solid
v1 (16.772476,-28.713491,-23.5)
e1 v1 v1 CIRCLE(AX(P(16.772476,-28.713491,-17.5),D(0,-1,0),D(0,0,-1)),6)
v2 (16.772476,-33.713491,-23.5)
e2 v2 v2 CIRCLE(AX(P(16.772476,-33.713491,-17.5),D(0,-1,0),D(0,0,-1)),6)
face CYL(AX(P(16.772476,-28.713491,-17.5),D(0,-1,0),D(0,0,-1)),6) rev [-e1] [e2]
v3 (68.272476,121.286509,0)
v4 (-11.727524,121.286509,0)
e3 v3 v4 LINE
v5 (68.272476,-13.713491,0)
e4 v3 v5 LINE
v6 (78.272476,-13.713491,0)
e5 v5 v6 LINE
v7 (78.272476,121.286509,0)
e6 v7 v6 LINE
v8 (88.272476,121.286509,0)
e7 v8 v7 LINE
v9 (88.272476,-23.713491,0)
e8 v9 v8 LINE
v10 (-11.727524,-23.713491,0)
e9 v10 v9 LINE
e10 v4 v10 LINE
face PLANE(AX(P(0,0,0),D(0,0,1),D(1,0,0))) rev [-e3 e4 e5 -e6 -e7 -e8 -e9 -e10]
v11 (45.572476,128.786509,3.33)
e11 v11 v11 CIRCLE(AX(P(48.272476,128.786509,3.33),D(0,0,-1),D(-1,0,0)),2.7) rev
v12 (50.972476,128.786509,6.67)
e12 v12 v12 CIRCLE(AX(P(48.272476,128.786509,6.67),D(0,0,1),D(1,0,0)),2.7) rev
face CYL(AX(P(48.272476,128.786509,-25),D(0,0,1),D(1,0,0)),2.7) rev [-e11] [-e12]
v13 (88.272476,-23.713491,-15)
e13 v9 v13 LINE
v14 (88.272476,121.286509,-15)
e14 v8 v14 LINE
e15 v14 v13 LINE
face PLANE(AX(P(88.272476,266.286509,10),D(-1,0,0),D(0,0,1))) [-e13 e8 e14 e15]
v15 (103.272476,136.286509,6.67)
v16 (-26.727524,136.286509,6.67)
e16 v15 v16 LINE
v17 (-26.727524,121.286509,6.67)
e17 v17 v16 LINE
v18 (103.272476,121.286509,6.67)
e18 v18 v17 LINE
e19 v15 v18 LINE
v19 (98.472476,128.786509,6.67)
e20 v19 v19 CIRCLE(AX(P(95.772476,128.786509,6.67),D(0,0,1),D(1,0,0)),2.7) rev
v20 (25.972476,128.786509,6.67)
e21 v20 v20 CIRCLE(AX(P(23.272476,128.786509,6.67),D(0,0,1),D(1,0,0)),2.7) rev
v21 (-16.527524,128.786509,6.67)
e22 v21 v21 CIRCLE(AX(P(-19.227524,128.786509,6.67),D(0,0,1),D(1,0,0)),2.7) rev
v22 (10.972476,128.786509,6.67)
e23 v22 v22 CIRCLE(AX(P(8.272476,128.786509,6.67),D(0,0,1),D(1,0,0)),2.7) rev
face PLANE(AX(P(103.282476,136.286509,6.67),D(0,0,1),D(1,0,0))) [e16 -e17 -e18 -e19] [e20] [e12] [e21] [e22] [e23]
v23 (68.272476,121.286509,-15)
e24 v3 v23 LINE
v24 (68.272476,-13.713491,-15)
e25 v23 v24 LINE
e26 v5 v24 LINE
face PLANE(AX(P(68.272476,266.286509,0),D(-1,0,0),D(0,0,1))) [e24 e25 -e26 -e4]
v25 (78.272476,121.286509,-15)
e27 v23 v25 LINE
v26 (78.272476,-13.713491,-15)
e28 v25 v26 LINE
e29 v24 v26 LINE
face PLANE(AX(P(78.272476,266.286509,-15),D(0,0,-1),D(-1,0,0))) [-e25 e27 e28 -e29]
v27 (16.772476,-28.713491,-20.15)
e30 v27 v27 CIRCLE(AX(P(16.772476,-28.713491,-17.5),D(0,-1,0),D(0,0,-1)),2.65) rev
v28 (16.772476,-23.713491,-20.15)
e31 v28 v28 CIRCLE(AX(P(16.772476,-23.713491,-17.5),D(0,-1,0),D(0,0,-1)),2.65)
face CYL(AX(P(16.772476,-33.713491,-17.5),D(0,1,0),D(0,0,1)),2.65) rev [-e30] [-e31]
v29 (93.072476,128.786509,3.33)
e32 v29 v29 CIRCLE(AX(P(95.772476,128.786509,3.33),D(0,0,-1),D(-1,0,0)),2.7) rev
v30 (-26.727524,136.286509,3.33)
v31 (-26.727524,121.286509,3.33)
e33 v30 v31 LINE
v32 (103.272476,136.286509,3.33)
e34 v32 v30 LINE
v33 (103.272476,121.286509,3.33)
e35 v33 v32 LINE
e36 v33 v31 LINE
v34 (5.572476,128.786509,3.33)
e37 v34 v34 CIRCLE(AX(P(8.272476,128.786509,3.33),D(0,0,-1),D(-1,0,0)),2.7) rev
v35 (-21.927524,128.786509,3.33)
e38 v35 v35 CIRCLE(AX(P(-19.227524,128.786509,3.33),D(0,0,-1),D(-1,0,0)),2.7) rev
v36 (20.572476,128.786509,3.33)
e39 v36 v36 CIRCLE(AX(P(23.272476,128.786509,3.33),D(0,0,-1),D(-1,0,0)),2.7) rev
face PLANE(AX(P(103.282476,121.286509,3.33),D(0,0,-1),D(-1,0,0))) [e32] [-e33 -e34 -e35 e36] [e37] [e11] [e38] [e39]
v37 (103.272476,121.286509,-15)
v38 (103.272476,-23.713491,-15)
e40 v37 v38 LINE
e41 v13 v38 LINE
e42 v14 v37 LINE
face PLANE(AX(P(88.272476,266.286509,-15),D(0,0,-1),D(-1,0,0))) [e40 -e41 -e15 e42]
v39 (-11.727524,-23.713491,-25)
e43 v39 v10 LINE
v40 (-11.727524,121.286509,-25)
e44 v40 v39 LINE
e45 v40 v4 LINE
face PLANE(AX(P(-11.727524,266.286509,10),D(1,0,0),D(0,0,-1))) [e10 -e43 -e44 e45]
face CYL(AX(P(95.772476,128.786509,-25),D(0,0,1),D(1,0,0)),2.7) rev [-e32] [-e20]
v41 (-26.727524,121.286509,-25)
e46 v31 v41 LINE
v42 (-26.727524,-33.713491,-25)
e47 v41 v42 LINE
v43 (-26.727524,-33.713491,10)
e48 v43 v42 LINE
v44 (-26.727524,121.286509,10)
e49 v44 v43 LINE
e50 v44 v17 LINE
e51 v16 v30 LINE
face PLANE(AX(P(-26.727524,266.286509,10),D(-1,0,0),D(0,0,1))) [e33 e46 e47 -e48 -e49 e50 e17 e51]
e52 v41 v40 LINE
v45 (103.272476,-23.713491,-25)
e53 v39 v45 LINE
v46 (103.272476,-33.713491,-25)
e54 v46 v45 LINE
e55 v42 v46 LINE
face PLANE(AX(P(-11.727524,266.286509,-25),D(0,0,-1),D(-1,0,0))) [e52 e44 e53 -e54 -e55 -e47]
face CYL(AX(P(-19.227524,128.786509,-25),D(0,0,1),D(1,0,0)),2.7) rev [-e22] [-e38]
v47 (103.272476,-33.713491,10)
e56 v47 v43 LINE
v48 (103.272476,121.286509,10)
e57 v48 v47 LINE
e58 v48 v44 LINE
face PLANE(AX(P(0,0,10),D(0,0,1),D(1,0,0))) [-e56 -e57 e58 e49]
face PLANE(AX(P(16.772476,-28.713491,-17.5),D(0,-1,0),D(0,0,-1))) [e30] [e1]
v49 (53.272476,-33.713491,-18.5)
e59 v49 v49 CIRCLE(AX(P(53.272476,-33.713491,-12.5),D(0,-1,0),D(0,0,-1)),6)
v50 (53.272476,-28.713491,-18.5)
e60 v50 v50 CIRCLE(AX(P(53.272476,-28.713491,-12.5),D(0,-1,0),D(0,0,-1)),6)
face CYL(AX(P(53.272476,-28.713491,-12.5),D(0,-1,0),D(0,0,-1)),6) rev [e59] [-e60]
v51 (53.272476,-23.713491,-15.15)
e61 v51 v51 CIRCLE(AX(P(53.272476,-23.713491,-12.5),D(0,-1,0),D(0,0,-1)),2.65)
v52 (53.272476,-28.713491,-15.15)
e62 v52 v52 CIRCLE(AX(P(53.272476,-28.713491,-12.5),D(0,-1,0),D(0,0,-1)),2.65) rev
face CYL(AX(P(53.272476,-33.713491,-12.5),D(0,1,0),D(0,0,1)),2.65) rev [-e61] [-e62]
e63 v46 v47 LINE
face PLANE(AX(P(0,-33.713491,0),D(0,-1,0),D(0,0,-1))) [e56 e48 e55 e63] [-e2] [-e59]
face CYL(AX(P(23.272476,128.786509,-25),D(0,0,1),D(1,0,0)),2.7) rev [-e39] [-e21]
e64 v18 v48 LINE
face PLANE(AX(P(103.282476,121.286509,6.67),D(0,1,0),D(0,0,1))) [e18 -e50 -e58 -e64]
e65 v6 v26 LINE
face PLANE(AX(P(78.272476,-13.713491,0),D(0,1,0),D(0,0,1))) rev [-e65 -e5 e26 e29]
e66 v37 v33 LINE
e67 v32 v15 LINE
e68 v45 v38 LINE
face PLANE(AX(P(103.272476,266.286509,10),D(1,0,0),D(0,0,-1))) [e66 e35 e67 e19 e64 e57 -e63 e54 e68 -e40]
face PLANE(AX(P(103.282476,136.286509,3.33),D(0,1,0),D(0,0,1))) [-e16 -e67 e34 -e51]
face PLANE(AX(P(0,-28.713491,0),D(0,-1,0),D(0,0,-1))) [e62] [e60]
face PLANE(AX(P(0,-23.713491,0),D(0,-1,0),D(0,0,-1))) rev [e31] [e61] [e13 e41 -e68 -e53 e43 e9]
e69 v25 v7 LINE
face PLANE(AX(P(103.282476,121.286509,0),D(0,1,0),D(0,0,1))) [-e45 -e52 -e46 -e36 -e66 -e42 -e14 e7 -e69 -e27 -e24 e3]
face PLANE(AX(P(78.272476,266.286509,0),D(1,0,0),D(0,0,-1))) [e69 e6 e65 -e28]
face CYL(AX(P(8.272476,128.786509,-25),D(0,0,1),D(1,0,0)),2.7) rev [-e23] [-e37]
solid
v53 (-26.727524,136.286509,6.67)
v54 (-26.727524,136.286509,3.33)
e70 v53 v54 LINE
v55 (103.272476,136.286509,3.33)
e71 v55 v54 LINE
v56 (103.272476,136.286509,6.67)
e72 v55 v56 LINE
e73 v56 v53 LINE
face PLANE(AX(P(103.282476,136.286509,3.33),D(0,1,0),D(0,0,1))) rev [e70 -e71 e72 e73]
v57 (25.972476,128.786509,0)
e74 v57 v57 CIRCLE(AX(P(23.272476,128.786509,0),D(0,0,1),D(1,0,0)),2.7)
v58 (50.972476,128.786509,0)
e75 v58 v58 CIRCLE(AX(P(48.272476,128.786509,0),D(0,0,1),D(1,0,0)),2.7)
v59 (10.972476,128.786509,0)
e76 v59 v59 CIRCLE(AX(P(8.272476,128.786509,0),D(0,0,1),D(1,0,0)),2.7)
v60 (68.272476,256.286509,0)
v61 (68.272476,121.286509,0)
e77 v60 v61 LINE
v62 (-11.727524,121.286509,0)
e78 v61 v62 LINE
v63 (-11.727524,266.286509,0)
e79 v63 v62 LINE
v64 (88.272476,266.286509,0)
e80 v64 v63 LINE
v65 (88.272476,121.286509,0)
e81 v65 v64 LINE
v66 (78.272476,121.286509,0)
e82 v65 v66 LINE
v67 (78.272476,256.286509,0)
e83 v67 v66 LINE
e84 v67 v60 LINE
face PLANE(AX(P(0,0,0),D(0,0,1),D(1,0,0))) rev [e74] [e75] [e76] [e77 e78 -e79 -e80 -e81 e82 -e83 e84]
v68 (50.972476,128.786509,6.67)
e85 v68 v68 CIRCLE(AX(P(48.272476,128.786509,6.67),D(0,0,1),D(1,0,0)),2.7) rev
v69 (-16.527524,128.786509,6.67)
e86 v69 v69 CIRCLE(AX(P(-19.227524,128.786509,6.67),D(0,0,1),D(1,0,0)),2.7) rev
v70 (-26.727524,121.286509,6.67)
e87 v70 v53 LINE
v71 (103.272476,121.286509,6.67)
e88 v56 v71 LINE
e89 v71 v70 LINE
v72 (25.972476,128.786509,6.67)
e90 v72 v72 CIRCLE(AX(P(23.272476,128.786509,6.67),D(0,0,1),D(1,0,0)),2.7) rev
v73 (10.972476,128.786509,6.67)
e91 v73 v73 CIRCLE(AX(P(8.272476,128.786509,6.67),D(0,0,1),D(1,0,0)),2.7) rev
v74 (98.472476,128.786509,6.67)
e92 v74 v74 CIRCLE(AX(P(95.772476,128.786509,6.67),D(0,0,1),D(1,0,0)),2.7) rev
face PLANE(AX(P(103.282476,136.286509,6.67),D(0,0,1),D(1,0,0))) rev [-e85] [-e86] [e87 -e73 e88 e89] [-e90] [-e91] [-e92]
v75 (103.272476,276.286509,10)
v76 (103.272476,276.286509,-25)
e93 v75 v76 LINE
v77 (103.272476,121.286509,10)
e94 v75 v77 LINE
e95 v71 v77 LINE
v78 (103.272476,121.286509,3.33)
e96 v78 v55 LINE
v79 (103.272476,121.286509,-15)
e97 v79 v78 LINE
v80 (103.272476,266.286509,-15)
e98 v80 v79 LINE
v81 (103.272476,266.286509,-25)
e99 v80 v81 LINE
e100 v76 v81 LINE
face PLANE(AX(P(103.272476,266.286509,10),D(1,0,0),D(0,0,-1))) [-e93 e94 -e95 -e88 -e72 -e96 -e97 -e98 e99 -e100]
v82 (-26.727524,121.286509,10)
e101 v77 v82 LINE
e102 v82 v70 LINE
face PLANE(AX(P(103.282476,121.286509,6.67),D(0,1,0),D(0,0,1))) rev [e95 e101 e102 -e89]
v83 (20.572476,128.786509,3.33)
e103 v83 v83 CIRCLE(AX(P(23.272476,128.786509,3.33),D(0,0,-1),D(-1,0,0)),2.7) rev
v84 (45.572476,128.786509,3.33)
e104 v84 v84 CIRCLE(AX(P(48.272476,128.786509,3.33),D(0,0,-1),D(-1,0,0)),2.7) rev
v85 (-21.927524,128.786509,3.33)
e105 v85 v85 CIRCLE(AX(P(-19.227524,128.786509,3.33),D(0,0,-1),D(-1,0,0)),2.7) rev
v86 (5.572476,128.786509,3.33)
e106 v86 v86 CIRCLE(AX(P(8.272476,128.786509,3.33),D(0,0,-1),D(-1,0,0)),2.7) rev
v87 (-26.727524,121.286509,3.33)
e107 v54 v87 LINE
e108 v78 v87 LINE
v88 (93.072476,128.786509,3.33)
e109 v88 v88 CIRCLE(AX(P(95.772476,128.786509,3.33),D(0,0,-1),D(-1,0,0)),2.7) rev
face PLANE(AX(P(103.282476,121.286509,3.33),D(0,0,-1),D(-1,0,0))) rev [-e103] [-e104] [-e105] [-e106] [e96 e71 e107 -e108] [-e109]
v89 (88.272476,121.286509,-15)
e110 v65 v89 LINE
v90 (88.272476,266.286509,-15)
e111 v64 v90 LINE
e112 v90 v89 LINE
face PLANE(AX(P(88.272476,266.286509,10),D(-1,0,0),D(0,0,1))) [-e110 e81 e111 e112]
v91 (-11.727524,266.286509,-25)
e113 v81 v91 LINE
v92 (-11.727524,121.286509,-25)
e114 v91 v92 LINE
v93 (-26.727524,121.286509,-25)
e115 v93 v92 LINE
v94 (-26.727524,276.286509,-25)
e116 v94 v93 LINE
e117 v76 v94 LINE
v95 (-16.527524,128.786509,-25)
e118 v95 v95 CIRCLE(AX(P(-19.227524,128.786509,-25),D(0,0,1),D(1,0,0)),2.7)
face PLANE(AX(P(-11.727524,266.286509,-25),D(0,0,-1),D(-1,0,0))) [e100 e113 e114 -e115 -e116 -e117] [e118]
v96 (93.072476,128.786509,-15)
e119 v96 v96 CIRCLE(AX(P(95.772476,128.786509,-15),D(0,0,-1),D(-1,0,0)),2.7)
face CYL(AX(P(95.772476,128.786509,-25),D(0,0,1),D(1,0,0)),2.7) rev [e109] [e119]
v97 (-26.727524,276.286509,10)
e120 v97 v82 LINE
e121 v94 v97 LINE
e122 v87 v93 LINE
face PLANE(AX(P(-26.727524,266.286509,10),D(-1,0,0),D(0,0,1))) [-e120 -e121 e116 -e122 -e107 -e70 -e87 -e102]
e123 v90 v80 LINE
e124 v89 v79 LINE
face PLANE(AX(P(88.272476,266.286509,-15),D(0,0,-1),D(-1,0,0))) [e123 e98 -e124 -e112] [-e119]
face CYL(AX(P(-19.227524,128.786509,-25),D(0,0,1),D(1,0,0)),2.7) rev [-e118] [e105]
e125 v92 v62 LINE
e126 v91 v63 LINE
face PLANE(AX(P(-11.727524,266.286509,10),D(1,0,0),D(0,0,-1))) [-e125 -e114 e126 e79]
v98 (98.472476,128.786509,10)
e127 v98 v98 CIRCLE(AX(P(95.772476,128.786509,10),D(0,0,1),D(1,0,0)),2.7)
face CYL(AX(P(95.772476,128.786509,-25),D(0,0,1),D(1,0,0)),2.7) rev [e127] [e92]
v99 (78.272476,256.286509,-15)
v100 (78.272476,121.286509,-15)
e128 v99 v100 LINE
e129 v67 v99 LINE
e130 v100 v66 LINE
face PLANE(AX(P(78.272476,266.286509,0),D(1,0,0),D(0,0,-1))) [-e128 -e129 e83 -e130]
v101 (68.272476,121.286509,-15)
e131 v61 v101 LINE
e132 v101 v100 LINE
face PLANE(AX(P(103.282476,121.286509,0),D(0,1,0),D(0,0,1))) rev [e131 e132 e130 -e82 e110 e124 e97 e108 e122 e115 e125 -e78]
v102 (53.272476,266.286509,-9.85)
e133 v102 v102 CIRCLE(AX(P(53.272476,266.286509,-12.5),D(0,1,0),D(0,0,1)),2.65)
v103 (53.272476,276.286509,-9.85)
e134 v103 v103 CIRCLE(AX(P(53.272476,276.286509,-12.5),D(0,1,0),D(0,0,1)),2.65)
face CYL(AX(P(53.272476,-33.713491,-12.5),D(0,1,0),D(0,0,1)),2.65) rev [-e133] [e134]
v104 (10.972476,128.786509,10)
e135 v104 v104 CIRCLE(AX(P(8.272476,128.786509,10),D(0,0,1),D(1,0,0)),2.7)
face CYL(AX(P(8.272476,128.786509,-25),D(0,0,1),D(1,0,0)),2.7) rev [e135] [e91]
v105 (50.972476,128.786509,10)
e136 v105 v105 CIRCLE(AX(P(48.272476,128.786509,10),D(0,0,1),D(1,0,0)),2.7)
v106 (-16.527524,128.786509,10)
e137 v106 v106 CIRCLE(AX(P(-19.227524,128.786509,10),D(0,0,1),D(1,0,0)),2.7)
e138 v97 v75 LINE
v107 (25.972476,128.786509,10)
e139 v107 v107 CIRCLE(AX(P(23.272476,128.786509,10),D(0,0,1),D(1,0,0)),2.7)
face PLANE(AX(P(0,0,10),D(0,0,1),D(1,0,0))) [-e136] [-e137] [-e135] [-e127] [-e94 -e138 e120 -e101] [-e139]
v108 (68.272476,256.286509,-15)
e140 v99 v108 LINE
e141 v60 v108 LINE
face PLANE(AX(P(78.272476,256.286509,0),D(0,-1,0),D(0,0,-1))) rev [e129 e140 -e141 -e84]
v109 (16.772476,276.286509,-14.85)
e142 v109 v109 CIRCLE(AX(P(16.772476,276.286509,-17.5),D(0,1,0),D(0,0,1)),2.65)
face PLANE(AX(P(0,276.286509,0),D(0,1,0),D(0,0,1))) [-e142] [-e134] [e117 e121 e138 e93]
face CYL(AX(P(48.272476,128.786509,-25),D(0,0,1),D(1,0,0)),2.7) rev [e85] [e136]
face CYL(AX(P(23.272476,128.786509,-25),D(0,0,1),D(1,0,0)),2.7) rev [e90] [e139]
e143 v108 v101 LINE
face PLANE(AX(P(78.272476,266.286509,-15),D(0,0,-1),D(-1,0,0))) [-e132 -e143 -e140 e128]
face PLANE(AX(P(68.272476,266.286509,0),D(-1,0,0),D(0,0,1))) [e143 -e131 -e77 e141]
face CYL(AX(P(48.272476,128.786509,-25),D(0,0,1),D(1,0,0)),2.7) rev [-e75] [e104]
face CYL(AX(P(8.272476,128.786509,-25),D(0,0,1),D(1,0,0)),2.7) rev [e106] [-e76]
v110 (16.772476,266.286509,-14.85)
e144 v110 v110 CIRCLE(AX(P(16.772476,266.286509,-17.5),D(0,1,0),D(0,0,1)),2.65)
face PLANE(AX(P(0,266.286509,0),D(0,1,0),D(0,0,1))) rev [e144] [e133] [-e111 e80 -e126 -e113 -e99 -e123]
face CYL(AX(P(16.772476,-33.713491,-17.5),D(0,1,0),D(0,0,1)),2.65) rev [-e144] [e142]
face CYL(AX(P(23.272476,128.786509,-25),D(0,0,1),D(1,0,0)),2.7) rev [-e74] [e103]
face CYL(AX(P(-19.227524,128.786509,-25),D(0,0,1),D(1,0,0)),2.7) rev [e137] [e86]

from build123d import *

# Parameters (mm, degrees)
SKETCH1_W               = 100
SKETCH1_H               = 280
BOSS_EXTRUDE1_DEPTH     = 10
SKETCH2_W               = 100
SKETCH2_H               = 10
BOSS_EXTRUDE2_DEPTH     = 10
SKETCH4_W               = 15
SKETCH4_H               = 35
SKETCH4_H_2             = 25
SKETCH4_W_2             = 10
SKETCH4_H_3             = 15
BOSS_EXTRUDE3_DEPTH     = 290
SKETCH5_W               = 10
SKETCH5_H               = 10
CUT_EXTRUDE1_DEPTH      = 15
SKETCH6_W               = 130
SKETCH6_H               = 35
BOSS_EXTRUDE4_DEPTH     = 10
SKETCH7_W               = 130
SKETCH7_H               = 35
BOSS_EXTRUDE5_DEPTH     = 10
CUT_EXTRUDE2_DEPTH      = 298.025990798
CUT_EXTRUDE2_DEPTH_BACK = 298.025990798
SKETCH15_R              = 2.7
SPLIT1_OUTLINE_W        = 130
SPLIT1_OUTLINE_H        = 140
SPLIT1_DEPTH            = 10
SPLIT1_START            = -15
SPLIT1_2_OUTLINE_R      = 2.7
SPLIT1_2_OUTLINE_W      = 10
SPLIT1_2_OUTLINE_H      = 135
SPLIT1_2_DEPTH          = 18.33
SPLIT1_START_2          = -25
SPLIT1_3_OUTLINE_R      = 2.7
SPLIT1_3_DEPTH          = 10
SPLIT1_START_3          = 6.67
SPLIT1_4_OUTLINE_W      = 130
SPLIT1_4_OUTLINE_H      = 15
SPLIT1_4_OUTLINE_R      = 2.7
SPLIT1_4_DEPTH          = 3.33
SPLIT1_5_OUTLINE_W      = 10
SPLIT1_5_OUTLINE_H      = 15
SPLIT1_5_OUTLINE_W_2    = 80
SPLIT1_5_OUTLINE_R      = 2.7
SPLIT1_5_DEPTH          = 3.33
SPLIT1_6_OUTLINE_W      = 130
SPLIT1_6_OUTLINE_H      = 140
SPLIT1_6_DEPTH          = 35
SPLIT1_7_OUTLINE_W      = 130
SPLIT1_7_OUTLINE_H      = 15
SPLIT1_7_OUTLINE_R      = 2.7
SPLIT1_7_DEPTH          = 28.33
SPLIT1_8_OUTLINE_W      = 130
SPLIT1_8_OUTLINE_H      = 15
SPLIT1_8_OUTLINE_R      = 2.7
SPLIT1_8_DEPTH          = 3.33
CUT_EXTRUDE5_DEPTH      = 328.704446471
CUT_EXTRUDE5_DEPTH_BACK = 328.704446471
SKETCH16_R              = 2.65
CUT_EXTRUDE6_START      = -5
SKETCH17_R              = 6
SKETCH17_R_2            = 2.65
CUT_EXTRUDE6_DEPTH      = 5


# Read off the part's stored shape, not the designer's step: Split1
with BuildPart() as part:
    # Sketch1 → Boss-Extrude1 (new body)
    with BuildSketch(Plane.XY):
        with Locations((38.272475697, 126.286508851)):
            Rectangle(SKETCH1_W, SKETCH1_H)
    extrude(amount=BOSS_EXTRUDE1_DEPTH)

    # Sketch2 → Boss-Extrude2 (add)
    with BuildSketch(Plane.XZ.offset(13.713491149)):
        with Locations((38.272475697, 5)):
            Rectangle(SKETCH2_W, SKETCH2_H)
    extrude(amount=BOSS_EXTRUDE2_DEPTH)

    # Sketch4 → Boss-Extrude3 (add)
    with BuildSketch(Plane.XZ.offset(23.713491149)):
        with Locations((-19.227524303, -7.5)):
            Rectangle(SKETCH4_W, SKETCH4_H)
        with Locations((95.772475697, -2.5)):
            Rectangle(SKETCH4_W, SKETCH4_H_2)
        with Locations((73.272475697, -7.5)):
            Rectangle(SKETCH4_W_2, SKETCH4_H_3)
    extrude(amount=-BOSS_EXTRUDE3_DEPTH)

    # Sketch5 → Cut-Extrude1 (cut)
    with BuildSketch(Plane(origin=(0, 0, -15), x_dir=(-1, 0, 0), z_dir=(0, 0, -1))):
        with Locations((-73.272475697, 261.286508851)):
            Rectangle(SKETCH5_W, SKETCH5_H)
        with Locations((-73.272475697, -18.713491149)):
            Rectangle(SKETCH5_W, SKETCH5_H)
    extrude(amount=-CUT_EXTRUDE1_DEPTH, mode=Mode.SUBTRACT)

    # Sketch6 → Boss-Extrude4 (add)
    with BuildSketch(Plane.XZ.offset(23.713491149)):
        with Locations((38.272475697, -7.5)):
            Rectangle(SKETCH6_W, SKETCH6_H)
    extrude(amount=BOSS_EXTRUDE4_DEPTH)

    # Sketch7 → Boss-Extrude5 (add)
    with BuildSketch(Plane(origin=(0, 266.286508851, 0), x_dir=(1, 0, 0), z_dir=(0, 1, 0))):
        with Locations((38.272475697, 7.5)):
            Rectangle(SKETCH7_W, SKETCH7_H)
    extrude(amount=BOSS_EXTRUDE5_DEPTH)

    # Sketch15 → Cut-Extrude2 (cut, two sides: drawn at the far end of the back side and taken through both)
    with BuildSketch(Plane.XY.offset(10).offset(-CUT_EXTRUDE2_DEPTH_BACK)):
        with Locations((8.272475697, 128.786508851)):
            Circle(SKETCH15_R)
        with Locations((23.272475697, 128.786508851)):
            Circle(SKETCH15_R)
        with Locations((48.272475697, 128.786508851)):
            Circle(SKETCH15_R)
        with Locations((-19.227524303, 128.786508851)):
            Circle(SKETCH15_R)
        with Locations((95.772475697, 128.786508851)):
            Circle(SKETCH15_R)
    extrude(amount=CUT_EXTRUDE2_DEPTH + CUT_EXTRUDE2_DEPTH_BACK, mode=Mode.SUBTRACT)

    # Split1 6 outline → Split1 6 (cut)
    with BuildSketch(Plane.XY.offset(SPLIT1_START_2)):
        with Locations((38.272475697, 206.286508851)):
            Rectangle(SPLIT1_6_OUTLINE_W, SPLIT1_6_OUTLINE_H)
    extrude(amount=SPLIT1_6_DEPTH, mode=Mode.SUBTRACT)

    # Split1 7 outline → Split1 7 (cut)
    with BuildSketch(Plane.XY.offset(SPLIT1_START_2)):
        with Locations((38.272475697, 128.786508851)):
            Rectangle(SPLIT1_7_OUTLINE_W, SPLIT1_7_OUTLINE_H)
        with Locations((95.772475697, 128.786508851)):
            Circle(SPLIT1_7_OUTLINE_R, mode=Mode.SUBTRACT)
        with Locations((48.272475697, 128.786508851)):
            Circle(SPLIT1_7_OUTLINE_R, mode=Mode.SUBTRACT)
        with Locations((8.272475697, 128.786508851)):
            Circle(SPLIT1_7_OUTLINE_R, mode=Mode.SUBTRACT)
        with Locations((23.272475697, 128.786508851)):
            Circle(SPLIT1_7_OUTLINE_R, mode=Mode.SUBTRACT)
        with Locations((-19.227524303, 128.786508851)):
            Circle(SPLIT1_7_OUTLINE_R, mode=Mode.SUBTRACT)
    extrude(amount=SPLIT1_7_DEPTH, mode=Mode.SUBTRACT)

    # Split1 8 outline → Split1 8 (cut)
    with BuildSketch(Plane.XY.offset(SPLIT1_START_3)):
        with Locations((38.272475697, 128.786508851)):
            Rectangle(SPLIT1_8_OUTLINE_W, SPLIT1_8_OUTLINE_H)
        with Locations((95.772475697, 128.786508851)):
            Circle(SPLIT1_8_OUTLINE_R, mode=Mode.SUBTRACT)
        with Locations((48.272475697, 128.786508851)):
            Circle(SPLIT1_8_OUTLINE_R, mode=Mode.SUBTRACT)
        with Locations((8.272475697, 128.786508851)):
            Circle(SPLIT1_8_OUTLINE_R, mode=Mode.SUBTRACT)
        with Locations((23.272475697, 128.786508851)):
            Circle(SPLIT1_8_OUTLINE_R, mode=Mode.SUBTRACT)
        with Locations((-19.227524303, 128.786508851)):
            Circle(SPLIT1_8_OUTLINE_R, mode=Mode.SUBTRACT)
    extrude(amount=SPLIT1_8_DEPTH, mode=Mode.SUBTRACT)


with BuildPart() as body_2:
    # Split1 outline → Split1 (new body)
    with BuildSketch(Plane.XY):
        with Locations((38.272475697, 206.286508851)):
            Rectangle(SPLIT1_OUTLINE_W, SPLIT1_OUTLINE_H)
    extrude(amount=SPLIT1_DEPTH)

    # Split1 2 outline → Split1 2 (add)
    # profile 1 of 2: a face of its own
    with BuildSketch(Plane.XY.offset(SPLIT1_START)):
        Polygon((88.272475697, 121.286508851), (103.272475697, 121.286508851), (103.272475697, 276.286508851), (-26.727524303, 276.286508851), (-26.727524303, 121.286508851), (-11.727524303, 121.286508851), (-11.727524303, 266.286508851), (88.272475697, 266.286508851), align=None)
        with Locations((95.772475697, 128.786508851)):
            Circle(SPLIT1_2_OUTLINE_R, mode=Mode.SUBTRACT)
        with Locations((-19.227524303, 128.786508851)):
            Circle(SPLIT1_2_OUTLINE_R, mode=Mode.SUBTRACT)
    # profile 2 of 2: a face of its own
    with BuildSketch(Plane.XY.offset(SPLIT1_START)):
        with Locations((73.272475697, 188.786508851)):
            Rectangle(SPLIT1_2_OUTLINE_W, SPLIT1_2_OUTLINE_H)
    extrude(amount=SPLIT1_2_DEPTH)

    # Split1 3 outline → Split1 3 (add)
    with BuildSketch(Plane.XY.offset(SPLIT1_START_2)):
        Polygon((103.272475697, 266.286508851), (103.272475697, 276.286508851), (-26.727524303, 276.286508851), (-26.727524303, 121.286508851), (-11.727524303, 121.286508851), (-11.727524303, 266.286508851), align=None)
        with Locations((-19.227524303, 128.786508851)):
            Circle(SPLIT1_3_OUTLINE_R, mode=Mode.SUBTRACT)
    extrude(amount=SPLIT1_3_DEPTH)

    # Split1 4 outline → Split1 4 (add)
    with BuildSketch(Plane.XY.offset(SPLIT1_START_3)):
        with Locations((38.272475697, 128.786508851)):
            Rectangle(SPLIT1_4_OUTLINE_W, SPLIT1_4_OUTLINE_H)
        with Locations((95.772475697, 128.786508851)):
            Circle(SPLIT1_4_OUTLINE_R, mode=Mode.SUBTRACT)
        with Locations((48.272475697, 128.786508851)):
            Circle(SPLIT1_4_OUTLINE_R, mode=Mode.SUBTRACT)
        with Locations((8.272475697, 128.786508851)):
            Circle(SPLIT1_4_OUTLINE_R, mode=Mode.SUBTRACT)
        with Locations((23.272475697, 128.786508851)):
            Circle(SPLIT1_4_OUTLINE_R, mode=Mode.SUBTRACT)
        with Locations((-19.227524303, 128.786508851)):
            Circle(SPLIT1_4_OUTLINE_R, mode=Mode.SUBTRACT)
    extrude(amount=SPLIT1_4_DEPTH)

    # Split1 5 outline → Split1 5 (add)
    # profile 1 of 2: a face of its own
    with BuildSketch(Plane.XY):
        with Locations((83.272475697, 128.786508851)):
            Rectangle(SPLIT1_5_OUTLINE_W, SPLIT1_5_OUTLINE_H)
    # profile 2 of 2: a face of its own
    with BuildSketch(Plane.XY):
        with Locations((28.272475697, 128.786508851)):
            Rectangle(SPLIT1_5_OUTLINE_W_2, SPLIT1_5_OUTLINE_H)
        with Locations((8.272475697, 128.786508851)):
            Circle(SPLIT1_5_OUTLINE_R, mode=Mode.SUBTRACT)
        with Locations((23.272475697, 128.786508851)):
            Circle(SPLIT1_5_OUTLINE_R, mode=Mode.SUBTRACT)
        with Locations((48.272475697, 128.786508851)):
            Circle(SPLIT1_5_OUTLINE_R, mode=Mode.SUBTRACT)
    extrude(amount=SPLIT1_5_DEPTH)


with BuildPart() as cut_extrude5_tool:
    # Sketch16 → Cut-Extrude5 (new, two sides: drawn at the far end of the back side and taken through both)
    with BuildSketch(Plane(origin=(0, 276.286508851, 0), x_dir=(1, 0, 0), z_dir=(0, 1, 0)).offset(-CUT_EXTRUDE5_DEPTH_BACK)):
        with Locations(Location((16.772475697, 17.5, 0), (0, 0, 270))):
            Circle(SKETCH16_R)
        with Locations(Location((53.272475697, 12.5, 0), (0, 0, 270))):
            Circle(SKETCH16_R)
    extrude(amount=CUT_EXTRUDE5_DEPTH + CUT_EXTRUDE5_DEPTH_BACK)


with BuildPart() as part_1:
    add(part.part)

    # Cut-Extrude5: cut by cut_extrude5_tool
    add(cut_extrude5_tool.part, mode=Mode.SUBTRACT)

    # Sketch17 → Cut-Extrude6 (cut)
    # profile 1 of 2: a face of its own
    with BuildSketch(Plane.XZ.offset(33.713491149).offset(CUT_EXTRUDE6_START)):
        with Locations(Location((53.272475697, -12.5, 0), (0, 0, 270))):
            Circle(SKETCH17_R)
        with Locations(Location((53.272475697, -12.5, 0), (0, 0, 90))):
            Circle(SKETCH17_R_2, mode=Mode.SUBTRACT)
    # profile 2 of 2: a face of its own
    with BuildSketch(Plane.XZ.offset(33.713491149).offset(CUT_EXTRUDE6_START)):
        with Locations(Location((16.772475697, -17.5, 0), (0, 0, 270))):
            Circle(SKETCH17_R)
    extrude(amount=CUT_EXTRUDE6_DEPTH, mode=Mode.SUBTRACT)


with BuildPart() as body_2_1:
    add(body_2.part)

    # Cut-Extrude5: cut by cut_extrude5_tool
    add(cut_extrude5_tool.part, mode=Mode.SUBTRACT)


solid = Compound([part_1.part, body_2_1.part])
